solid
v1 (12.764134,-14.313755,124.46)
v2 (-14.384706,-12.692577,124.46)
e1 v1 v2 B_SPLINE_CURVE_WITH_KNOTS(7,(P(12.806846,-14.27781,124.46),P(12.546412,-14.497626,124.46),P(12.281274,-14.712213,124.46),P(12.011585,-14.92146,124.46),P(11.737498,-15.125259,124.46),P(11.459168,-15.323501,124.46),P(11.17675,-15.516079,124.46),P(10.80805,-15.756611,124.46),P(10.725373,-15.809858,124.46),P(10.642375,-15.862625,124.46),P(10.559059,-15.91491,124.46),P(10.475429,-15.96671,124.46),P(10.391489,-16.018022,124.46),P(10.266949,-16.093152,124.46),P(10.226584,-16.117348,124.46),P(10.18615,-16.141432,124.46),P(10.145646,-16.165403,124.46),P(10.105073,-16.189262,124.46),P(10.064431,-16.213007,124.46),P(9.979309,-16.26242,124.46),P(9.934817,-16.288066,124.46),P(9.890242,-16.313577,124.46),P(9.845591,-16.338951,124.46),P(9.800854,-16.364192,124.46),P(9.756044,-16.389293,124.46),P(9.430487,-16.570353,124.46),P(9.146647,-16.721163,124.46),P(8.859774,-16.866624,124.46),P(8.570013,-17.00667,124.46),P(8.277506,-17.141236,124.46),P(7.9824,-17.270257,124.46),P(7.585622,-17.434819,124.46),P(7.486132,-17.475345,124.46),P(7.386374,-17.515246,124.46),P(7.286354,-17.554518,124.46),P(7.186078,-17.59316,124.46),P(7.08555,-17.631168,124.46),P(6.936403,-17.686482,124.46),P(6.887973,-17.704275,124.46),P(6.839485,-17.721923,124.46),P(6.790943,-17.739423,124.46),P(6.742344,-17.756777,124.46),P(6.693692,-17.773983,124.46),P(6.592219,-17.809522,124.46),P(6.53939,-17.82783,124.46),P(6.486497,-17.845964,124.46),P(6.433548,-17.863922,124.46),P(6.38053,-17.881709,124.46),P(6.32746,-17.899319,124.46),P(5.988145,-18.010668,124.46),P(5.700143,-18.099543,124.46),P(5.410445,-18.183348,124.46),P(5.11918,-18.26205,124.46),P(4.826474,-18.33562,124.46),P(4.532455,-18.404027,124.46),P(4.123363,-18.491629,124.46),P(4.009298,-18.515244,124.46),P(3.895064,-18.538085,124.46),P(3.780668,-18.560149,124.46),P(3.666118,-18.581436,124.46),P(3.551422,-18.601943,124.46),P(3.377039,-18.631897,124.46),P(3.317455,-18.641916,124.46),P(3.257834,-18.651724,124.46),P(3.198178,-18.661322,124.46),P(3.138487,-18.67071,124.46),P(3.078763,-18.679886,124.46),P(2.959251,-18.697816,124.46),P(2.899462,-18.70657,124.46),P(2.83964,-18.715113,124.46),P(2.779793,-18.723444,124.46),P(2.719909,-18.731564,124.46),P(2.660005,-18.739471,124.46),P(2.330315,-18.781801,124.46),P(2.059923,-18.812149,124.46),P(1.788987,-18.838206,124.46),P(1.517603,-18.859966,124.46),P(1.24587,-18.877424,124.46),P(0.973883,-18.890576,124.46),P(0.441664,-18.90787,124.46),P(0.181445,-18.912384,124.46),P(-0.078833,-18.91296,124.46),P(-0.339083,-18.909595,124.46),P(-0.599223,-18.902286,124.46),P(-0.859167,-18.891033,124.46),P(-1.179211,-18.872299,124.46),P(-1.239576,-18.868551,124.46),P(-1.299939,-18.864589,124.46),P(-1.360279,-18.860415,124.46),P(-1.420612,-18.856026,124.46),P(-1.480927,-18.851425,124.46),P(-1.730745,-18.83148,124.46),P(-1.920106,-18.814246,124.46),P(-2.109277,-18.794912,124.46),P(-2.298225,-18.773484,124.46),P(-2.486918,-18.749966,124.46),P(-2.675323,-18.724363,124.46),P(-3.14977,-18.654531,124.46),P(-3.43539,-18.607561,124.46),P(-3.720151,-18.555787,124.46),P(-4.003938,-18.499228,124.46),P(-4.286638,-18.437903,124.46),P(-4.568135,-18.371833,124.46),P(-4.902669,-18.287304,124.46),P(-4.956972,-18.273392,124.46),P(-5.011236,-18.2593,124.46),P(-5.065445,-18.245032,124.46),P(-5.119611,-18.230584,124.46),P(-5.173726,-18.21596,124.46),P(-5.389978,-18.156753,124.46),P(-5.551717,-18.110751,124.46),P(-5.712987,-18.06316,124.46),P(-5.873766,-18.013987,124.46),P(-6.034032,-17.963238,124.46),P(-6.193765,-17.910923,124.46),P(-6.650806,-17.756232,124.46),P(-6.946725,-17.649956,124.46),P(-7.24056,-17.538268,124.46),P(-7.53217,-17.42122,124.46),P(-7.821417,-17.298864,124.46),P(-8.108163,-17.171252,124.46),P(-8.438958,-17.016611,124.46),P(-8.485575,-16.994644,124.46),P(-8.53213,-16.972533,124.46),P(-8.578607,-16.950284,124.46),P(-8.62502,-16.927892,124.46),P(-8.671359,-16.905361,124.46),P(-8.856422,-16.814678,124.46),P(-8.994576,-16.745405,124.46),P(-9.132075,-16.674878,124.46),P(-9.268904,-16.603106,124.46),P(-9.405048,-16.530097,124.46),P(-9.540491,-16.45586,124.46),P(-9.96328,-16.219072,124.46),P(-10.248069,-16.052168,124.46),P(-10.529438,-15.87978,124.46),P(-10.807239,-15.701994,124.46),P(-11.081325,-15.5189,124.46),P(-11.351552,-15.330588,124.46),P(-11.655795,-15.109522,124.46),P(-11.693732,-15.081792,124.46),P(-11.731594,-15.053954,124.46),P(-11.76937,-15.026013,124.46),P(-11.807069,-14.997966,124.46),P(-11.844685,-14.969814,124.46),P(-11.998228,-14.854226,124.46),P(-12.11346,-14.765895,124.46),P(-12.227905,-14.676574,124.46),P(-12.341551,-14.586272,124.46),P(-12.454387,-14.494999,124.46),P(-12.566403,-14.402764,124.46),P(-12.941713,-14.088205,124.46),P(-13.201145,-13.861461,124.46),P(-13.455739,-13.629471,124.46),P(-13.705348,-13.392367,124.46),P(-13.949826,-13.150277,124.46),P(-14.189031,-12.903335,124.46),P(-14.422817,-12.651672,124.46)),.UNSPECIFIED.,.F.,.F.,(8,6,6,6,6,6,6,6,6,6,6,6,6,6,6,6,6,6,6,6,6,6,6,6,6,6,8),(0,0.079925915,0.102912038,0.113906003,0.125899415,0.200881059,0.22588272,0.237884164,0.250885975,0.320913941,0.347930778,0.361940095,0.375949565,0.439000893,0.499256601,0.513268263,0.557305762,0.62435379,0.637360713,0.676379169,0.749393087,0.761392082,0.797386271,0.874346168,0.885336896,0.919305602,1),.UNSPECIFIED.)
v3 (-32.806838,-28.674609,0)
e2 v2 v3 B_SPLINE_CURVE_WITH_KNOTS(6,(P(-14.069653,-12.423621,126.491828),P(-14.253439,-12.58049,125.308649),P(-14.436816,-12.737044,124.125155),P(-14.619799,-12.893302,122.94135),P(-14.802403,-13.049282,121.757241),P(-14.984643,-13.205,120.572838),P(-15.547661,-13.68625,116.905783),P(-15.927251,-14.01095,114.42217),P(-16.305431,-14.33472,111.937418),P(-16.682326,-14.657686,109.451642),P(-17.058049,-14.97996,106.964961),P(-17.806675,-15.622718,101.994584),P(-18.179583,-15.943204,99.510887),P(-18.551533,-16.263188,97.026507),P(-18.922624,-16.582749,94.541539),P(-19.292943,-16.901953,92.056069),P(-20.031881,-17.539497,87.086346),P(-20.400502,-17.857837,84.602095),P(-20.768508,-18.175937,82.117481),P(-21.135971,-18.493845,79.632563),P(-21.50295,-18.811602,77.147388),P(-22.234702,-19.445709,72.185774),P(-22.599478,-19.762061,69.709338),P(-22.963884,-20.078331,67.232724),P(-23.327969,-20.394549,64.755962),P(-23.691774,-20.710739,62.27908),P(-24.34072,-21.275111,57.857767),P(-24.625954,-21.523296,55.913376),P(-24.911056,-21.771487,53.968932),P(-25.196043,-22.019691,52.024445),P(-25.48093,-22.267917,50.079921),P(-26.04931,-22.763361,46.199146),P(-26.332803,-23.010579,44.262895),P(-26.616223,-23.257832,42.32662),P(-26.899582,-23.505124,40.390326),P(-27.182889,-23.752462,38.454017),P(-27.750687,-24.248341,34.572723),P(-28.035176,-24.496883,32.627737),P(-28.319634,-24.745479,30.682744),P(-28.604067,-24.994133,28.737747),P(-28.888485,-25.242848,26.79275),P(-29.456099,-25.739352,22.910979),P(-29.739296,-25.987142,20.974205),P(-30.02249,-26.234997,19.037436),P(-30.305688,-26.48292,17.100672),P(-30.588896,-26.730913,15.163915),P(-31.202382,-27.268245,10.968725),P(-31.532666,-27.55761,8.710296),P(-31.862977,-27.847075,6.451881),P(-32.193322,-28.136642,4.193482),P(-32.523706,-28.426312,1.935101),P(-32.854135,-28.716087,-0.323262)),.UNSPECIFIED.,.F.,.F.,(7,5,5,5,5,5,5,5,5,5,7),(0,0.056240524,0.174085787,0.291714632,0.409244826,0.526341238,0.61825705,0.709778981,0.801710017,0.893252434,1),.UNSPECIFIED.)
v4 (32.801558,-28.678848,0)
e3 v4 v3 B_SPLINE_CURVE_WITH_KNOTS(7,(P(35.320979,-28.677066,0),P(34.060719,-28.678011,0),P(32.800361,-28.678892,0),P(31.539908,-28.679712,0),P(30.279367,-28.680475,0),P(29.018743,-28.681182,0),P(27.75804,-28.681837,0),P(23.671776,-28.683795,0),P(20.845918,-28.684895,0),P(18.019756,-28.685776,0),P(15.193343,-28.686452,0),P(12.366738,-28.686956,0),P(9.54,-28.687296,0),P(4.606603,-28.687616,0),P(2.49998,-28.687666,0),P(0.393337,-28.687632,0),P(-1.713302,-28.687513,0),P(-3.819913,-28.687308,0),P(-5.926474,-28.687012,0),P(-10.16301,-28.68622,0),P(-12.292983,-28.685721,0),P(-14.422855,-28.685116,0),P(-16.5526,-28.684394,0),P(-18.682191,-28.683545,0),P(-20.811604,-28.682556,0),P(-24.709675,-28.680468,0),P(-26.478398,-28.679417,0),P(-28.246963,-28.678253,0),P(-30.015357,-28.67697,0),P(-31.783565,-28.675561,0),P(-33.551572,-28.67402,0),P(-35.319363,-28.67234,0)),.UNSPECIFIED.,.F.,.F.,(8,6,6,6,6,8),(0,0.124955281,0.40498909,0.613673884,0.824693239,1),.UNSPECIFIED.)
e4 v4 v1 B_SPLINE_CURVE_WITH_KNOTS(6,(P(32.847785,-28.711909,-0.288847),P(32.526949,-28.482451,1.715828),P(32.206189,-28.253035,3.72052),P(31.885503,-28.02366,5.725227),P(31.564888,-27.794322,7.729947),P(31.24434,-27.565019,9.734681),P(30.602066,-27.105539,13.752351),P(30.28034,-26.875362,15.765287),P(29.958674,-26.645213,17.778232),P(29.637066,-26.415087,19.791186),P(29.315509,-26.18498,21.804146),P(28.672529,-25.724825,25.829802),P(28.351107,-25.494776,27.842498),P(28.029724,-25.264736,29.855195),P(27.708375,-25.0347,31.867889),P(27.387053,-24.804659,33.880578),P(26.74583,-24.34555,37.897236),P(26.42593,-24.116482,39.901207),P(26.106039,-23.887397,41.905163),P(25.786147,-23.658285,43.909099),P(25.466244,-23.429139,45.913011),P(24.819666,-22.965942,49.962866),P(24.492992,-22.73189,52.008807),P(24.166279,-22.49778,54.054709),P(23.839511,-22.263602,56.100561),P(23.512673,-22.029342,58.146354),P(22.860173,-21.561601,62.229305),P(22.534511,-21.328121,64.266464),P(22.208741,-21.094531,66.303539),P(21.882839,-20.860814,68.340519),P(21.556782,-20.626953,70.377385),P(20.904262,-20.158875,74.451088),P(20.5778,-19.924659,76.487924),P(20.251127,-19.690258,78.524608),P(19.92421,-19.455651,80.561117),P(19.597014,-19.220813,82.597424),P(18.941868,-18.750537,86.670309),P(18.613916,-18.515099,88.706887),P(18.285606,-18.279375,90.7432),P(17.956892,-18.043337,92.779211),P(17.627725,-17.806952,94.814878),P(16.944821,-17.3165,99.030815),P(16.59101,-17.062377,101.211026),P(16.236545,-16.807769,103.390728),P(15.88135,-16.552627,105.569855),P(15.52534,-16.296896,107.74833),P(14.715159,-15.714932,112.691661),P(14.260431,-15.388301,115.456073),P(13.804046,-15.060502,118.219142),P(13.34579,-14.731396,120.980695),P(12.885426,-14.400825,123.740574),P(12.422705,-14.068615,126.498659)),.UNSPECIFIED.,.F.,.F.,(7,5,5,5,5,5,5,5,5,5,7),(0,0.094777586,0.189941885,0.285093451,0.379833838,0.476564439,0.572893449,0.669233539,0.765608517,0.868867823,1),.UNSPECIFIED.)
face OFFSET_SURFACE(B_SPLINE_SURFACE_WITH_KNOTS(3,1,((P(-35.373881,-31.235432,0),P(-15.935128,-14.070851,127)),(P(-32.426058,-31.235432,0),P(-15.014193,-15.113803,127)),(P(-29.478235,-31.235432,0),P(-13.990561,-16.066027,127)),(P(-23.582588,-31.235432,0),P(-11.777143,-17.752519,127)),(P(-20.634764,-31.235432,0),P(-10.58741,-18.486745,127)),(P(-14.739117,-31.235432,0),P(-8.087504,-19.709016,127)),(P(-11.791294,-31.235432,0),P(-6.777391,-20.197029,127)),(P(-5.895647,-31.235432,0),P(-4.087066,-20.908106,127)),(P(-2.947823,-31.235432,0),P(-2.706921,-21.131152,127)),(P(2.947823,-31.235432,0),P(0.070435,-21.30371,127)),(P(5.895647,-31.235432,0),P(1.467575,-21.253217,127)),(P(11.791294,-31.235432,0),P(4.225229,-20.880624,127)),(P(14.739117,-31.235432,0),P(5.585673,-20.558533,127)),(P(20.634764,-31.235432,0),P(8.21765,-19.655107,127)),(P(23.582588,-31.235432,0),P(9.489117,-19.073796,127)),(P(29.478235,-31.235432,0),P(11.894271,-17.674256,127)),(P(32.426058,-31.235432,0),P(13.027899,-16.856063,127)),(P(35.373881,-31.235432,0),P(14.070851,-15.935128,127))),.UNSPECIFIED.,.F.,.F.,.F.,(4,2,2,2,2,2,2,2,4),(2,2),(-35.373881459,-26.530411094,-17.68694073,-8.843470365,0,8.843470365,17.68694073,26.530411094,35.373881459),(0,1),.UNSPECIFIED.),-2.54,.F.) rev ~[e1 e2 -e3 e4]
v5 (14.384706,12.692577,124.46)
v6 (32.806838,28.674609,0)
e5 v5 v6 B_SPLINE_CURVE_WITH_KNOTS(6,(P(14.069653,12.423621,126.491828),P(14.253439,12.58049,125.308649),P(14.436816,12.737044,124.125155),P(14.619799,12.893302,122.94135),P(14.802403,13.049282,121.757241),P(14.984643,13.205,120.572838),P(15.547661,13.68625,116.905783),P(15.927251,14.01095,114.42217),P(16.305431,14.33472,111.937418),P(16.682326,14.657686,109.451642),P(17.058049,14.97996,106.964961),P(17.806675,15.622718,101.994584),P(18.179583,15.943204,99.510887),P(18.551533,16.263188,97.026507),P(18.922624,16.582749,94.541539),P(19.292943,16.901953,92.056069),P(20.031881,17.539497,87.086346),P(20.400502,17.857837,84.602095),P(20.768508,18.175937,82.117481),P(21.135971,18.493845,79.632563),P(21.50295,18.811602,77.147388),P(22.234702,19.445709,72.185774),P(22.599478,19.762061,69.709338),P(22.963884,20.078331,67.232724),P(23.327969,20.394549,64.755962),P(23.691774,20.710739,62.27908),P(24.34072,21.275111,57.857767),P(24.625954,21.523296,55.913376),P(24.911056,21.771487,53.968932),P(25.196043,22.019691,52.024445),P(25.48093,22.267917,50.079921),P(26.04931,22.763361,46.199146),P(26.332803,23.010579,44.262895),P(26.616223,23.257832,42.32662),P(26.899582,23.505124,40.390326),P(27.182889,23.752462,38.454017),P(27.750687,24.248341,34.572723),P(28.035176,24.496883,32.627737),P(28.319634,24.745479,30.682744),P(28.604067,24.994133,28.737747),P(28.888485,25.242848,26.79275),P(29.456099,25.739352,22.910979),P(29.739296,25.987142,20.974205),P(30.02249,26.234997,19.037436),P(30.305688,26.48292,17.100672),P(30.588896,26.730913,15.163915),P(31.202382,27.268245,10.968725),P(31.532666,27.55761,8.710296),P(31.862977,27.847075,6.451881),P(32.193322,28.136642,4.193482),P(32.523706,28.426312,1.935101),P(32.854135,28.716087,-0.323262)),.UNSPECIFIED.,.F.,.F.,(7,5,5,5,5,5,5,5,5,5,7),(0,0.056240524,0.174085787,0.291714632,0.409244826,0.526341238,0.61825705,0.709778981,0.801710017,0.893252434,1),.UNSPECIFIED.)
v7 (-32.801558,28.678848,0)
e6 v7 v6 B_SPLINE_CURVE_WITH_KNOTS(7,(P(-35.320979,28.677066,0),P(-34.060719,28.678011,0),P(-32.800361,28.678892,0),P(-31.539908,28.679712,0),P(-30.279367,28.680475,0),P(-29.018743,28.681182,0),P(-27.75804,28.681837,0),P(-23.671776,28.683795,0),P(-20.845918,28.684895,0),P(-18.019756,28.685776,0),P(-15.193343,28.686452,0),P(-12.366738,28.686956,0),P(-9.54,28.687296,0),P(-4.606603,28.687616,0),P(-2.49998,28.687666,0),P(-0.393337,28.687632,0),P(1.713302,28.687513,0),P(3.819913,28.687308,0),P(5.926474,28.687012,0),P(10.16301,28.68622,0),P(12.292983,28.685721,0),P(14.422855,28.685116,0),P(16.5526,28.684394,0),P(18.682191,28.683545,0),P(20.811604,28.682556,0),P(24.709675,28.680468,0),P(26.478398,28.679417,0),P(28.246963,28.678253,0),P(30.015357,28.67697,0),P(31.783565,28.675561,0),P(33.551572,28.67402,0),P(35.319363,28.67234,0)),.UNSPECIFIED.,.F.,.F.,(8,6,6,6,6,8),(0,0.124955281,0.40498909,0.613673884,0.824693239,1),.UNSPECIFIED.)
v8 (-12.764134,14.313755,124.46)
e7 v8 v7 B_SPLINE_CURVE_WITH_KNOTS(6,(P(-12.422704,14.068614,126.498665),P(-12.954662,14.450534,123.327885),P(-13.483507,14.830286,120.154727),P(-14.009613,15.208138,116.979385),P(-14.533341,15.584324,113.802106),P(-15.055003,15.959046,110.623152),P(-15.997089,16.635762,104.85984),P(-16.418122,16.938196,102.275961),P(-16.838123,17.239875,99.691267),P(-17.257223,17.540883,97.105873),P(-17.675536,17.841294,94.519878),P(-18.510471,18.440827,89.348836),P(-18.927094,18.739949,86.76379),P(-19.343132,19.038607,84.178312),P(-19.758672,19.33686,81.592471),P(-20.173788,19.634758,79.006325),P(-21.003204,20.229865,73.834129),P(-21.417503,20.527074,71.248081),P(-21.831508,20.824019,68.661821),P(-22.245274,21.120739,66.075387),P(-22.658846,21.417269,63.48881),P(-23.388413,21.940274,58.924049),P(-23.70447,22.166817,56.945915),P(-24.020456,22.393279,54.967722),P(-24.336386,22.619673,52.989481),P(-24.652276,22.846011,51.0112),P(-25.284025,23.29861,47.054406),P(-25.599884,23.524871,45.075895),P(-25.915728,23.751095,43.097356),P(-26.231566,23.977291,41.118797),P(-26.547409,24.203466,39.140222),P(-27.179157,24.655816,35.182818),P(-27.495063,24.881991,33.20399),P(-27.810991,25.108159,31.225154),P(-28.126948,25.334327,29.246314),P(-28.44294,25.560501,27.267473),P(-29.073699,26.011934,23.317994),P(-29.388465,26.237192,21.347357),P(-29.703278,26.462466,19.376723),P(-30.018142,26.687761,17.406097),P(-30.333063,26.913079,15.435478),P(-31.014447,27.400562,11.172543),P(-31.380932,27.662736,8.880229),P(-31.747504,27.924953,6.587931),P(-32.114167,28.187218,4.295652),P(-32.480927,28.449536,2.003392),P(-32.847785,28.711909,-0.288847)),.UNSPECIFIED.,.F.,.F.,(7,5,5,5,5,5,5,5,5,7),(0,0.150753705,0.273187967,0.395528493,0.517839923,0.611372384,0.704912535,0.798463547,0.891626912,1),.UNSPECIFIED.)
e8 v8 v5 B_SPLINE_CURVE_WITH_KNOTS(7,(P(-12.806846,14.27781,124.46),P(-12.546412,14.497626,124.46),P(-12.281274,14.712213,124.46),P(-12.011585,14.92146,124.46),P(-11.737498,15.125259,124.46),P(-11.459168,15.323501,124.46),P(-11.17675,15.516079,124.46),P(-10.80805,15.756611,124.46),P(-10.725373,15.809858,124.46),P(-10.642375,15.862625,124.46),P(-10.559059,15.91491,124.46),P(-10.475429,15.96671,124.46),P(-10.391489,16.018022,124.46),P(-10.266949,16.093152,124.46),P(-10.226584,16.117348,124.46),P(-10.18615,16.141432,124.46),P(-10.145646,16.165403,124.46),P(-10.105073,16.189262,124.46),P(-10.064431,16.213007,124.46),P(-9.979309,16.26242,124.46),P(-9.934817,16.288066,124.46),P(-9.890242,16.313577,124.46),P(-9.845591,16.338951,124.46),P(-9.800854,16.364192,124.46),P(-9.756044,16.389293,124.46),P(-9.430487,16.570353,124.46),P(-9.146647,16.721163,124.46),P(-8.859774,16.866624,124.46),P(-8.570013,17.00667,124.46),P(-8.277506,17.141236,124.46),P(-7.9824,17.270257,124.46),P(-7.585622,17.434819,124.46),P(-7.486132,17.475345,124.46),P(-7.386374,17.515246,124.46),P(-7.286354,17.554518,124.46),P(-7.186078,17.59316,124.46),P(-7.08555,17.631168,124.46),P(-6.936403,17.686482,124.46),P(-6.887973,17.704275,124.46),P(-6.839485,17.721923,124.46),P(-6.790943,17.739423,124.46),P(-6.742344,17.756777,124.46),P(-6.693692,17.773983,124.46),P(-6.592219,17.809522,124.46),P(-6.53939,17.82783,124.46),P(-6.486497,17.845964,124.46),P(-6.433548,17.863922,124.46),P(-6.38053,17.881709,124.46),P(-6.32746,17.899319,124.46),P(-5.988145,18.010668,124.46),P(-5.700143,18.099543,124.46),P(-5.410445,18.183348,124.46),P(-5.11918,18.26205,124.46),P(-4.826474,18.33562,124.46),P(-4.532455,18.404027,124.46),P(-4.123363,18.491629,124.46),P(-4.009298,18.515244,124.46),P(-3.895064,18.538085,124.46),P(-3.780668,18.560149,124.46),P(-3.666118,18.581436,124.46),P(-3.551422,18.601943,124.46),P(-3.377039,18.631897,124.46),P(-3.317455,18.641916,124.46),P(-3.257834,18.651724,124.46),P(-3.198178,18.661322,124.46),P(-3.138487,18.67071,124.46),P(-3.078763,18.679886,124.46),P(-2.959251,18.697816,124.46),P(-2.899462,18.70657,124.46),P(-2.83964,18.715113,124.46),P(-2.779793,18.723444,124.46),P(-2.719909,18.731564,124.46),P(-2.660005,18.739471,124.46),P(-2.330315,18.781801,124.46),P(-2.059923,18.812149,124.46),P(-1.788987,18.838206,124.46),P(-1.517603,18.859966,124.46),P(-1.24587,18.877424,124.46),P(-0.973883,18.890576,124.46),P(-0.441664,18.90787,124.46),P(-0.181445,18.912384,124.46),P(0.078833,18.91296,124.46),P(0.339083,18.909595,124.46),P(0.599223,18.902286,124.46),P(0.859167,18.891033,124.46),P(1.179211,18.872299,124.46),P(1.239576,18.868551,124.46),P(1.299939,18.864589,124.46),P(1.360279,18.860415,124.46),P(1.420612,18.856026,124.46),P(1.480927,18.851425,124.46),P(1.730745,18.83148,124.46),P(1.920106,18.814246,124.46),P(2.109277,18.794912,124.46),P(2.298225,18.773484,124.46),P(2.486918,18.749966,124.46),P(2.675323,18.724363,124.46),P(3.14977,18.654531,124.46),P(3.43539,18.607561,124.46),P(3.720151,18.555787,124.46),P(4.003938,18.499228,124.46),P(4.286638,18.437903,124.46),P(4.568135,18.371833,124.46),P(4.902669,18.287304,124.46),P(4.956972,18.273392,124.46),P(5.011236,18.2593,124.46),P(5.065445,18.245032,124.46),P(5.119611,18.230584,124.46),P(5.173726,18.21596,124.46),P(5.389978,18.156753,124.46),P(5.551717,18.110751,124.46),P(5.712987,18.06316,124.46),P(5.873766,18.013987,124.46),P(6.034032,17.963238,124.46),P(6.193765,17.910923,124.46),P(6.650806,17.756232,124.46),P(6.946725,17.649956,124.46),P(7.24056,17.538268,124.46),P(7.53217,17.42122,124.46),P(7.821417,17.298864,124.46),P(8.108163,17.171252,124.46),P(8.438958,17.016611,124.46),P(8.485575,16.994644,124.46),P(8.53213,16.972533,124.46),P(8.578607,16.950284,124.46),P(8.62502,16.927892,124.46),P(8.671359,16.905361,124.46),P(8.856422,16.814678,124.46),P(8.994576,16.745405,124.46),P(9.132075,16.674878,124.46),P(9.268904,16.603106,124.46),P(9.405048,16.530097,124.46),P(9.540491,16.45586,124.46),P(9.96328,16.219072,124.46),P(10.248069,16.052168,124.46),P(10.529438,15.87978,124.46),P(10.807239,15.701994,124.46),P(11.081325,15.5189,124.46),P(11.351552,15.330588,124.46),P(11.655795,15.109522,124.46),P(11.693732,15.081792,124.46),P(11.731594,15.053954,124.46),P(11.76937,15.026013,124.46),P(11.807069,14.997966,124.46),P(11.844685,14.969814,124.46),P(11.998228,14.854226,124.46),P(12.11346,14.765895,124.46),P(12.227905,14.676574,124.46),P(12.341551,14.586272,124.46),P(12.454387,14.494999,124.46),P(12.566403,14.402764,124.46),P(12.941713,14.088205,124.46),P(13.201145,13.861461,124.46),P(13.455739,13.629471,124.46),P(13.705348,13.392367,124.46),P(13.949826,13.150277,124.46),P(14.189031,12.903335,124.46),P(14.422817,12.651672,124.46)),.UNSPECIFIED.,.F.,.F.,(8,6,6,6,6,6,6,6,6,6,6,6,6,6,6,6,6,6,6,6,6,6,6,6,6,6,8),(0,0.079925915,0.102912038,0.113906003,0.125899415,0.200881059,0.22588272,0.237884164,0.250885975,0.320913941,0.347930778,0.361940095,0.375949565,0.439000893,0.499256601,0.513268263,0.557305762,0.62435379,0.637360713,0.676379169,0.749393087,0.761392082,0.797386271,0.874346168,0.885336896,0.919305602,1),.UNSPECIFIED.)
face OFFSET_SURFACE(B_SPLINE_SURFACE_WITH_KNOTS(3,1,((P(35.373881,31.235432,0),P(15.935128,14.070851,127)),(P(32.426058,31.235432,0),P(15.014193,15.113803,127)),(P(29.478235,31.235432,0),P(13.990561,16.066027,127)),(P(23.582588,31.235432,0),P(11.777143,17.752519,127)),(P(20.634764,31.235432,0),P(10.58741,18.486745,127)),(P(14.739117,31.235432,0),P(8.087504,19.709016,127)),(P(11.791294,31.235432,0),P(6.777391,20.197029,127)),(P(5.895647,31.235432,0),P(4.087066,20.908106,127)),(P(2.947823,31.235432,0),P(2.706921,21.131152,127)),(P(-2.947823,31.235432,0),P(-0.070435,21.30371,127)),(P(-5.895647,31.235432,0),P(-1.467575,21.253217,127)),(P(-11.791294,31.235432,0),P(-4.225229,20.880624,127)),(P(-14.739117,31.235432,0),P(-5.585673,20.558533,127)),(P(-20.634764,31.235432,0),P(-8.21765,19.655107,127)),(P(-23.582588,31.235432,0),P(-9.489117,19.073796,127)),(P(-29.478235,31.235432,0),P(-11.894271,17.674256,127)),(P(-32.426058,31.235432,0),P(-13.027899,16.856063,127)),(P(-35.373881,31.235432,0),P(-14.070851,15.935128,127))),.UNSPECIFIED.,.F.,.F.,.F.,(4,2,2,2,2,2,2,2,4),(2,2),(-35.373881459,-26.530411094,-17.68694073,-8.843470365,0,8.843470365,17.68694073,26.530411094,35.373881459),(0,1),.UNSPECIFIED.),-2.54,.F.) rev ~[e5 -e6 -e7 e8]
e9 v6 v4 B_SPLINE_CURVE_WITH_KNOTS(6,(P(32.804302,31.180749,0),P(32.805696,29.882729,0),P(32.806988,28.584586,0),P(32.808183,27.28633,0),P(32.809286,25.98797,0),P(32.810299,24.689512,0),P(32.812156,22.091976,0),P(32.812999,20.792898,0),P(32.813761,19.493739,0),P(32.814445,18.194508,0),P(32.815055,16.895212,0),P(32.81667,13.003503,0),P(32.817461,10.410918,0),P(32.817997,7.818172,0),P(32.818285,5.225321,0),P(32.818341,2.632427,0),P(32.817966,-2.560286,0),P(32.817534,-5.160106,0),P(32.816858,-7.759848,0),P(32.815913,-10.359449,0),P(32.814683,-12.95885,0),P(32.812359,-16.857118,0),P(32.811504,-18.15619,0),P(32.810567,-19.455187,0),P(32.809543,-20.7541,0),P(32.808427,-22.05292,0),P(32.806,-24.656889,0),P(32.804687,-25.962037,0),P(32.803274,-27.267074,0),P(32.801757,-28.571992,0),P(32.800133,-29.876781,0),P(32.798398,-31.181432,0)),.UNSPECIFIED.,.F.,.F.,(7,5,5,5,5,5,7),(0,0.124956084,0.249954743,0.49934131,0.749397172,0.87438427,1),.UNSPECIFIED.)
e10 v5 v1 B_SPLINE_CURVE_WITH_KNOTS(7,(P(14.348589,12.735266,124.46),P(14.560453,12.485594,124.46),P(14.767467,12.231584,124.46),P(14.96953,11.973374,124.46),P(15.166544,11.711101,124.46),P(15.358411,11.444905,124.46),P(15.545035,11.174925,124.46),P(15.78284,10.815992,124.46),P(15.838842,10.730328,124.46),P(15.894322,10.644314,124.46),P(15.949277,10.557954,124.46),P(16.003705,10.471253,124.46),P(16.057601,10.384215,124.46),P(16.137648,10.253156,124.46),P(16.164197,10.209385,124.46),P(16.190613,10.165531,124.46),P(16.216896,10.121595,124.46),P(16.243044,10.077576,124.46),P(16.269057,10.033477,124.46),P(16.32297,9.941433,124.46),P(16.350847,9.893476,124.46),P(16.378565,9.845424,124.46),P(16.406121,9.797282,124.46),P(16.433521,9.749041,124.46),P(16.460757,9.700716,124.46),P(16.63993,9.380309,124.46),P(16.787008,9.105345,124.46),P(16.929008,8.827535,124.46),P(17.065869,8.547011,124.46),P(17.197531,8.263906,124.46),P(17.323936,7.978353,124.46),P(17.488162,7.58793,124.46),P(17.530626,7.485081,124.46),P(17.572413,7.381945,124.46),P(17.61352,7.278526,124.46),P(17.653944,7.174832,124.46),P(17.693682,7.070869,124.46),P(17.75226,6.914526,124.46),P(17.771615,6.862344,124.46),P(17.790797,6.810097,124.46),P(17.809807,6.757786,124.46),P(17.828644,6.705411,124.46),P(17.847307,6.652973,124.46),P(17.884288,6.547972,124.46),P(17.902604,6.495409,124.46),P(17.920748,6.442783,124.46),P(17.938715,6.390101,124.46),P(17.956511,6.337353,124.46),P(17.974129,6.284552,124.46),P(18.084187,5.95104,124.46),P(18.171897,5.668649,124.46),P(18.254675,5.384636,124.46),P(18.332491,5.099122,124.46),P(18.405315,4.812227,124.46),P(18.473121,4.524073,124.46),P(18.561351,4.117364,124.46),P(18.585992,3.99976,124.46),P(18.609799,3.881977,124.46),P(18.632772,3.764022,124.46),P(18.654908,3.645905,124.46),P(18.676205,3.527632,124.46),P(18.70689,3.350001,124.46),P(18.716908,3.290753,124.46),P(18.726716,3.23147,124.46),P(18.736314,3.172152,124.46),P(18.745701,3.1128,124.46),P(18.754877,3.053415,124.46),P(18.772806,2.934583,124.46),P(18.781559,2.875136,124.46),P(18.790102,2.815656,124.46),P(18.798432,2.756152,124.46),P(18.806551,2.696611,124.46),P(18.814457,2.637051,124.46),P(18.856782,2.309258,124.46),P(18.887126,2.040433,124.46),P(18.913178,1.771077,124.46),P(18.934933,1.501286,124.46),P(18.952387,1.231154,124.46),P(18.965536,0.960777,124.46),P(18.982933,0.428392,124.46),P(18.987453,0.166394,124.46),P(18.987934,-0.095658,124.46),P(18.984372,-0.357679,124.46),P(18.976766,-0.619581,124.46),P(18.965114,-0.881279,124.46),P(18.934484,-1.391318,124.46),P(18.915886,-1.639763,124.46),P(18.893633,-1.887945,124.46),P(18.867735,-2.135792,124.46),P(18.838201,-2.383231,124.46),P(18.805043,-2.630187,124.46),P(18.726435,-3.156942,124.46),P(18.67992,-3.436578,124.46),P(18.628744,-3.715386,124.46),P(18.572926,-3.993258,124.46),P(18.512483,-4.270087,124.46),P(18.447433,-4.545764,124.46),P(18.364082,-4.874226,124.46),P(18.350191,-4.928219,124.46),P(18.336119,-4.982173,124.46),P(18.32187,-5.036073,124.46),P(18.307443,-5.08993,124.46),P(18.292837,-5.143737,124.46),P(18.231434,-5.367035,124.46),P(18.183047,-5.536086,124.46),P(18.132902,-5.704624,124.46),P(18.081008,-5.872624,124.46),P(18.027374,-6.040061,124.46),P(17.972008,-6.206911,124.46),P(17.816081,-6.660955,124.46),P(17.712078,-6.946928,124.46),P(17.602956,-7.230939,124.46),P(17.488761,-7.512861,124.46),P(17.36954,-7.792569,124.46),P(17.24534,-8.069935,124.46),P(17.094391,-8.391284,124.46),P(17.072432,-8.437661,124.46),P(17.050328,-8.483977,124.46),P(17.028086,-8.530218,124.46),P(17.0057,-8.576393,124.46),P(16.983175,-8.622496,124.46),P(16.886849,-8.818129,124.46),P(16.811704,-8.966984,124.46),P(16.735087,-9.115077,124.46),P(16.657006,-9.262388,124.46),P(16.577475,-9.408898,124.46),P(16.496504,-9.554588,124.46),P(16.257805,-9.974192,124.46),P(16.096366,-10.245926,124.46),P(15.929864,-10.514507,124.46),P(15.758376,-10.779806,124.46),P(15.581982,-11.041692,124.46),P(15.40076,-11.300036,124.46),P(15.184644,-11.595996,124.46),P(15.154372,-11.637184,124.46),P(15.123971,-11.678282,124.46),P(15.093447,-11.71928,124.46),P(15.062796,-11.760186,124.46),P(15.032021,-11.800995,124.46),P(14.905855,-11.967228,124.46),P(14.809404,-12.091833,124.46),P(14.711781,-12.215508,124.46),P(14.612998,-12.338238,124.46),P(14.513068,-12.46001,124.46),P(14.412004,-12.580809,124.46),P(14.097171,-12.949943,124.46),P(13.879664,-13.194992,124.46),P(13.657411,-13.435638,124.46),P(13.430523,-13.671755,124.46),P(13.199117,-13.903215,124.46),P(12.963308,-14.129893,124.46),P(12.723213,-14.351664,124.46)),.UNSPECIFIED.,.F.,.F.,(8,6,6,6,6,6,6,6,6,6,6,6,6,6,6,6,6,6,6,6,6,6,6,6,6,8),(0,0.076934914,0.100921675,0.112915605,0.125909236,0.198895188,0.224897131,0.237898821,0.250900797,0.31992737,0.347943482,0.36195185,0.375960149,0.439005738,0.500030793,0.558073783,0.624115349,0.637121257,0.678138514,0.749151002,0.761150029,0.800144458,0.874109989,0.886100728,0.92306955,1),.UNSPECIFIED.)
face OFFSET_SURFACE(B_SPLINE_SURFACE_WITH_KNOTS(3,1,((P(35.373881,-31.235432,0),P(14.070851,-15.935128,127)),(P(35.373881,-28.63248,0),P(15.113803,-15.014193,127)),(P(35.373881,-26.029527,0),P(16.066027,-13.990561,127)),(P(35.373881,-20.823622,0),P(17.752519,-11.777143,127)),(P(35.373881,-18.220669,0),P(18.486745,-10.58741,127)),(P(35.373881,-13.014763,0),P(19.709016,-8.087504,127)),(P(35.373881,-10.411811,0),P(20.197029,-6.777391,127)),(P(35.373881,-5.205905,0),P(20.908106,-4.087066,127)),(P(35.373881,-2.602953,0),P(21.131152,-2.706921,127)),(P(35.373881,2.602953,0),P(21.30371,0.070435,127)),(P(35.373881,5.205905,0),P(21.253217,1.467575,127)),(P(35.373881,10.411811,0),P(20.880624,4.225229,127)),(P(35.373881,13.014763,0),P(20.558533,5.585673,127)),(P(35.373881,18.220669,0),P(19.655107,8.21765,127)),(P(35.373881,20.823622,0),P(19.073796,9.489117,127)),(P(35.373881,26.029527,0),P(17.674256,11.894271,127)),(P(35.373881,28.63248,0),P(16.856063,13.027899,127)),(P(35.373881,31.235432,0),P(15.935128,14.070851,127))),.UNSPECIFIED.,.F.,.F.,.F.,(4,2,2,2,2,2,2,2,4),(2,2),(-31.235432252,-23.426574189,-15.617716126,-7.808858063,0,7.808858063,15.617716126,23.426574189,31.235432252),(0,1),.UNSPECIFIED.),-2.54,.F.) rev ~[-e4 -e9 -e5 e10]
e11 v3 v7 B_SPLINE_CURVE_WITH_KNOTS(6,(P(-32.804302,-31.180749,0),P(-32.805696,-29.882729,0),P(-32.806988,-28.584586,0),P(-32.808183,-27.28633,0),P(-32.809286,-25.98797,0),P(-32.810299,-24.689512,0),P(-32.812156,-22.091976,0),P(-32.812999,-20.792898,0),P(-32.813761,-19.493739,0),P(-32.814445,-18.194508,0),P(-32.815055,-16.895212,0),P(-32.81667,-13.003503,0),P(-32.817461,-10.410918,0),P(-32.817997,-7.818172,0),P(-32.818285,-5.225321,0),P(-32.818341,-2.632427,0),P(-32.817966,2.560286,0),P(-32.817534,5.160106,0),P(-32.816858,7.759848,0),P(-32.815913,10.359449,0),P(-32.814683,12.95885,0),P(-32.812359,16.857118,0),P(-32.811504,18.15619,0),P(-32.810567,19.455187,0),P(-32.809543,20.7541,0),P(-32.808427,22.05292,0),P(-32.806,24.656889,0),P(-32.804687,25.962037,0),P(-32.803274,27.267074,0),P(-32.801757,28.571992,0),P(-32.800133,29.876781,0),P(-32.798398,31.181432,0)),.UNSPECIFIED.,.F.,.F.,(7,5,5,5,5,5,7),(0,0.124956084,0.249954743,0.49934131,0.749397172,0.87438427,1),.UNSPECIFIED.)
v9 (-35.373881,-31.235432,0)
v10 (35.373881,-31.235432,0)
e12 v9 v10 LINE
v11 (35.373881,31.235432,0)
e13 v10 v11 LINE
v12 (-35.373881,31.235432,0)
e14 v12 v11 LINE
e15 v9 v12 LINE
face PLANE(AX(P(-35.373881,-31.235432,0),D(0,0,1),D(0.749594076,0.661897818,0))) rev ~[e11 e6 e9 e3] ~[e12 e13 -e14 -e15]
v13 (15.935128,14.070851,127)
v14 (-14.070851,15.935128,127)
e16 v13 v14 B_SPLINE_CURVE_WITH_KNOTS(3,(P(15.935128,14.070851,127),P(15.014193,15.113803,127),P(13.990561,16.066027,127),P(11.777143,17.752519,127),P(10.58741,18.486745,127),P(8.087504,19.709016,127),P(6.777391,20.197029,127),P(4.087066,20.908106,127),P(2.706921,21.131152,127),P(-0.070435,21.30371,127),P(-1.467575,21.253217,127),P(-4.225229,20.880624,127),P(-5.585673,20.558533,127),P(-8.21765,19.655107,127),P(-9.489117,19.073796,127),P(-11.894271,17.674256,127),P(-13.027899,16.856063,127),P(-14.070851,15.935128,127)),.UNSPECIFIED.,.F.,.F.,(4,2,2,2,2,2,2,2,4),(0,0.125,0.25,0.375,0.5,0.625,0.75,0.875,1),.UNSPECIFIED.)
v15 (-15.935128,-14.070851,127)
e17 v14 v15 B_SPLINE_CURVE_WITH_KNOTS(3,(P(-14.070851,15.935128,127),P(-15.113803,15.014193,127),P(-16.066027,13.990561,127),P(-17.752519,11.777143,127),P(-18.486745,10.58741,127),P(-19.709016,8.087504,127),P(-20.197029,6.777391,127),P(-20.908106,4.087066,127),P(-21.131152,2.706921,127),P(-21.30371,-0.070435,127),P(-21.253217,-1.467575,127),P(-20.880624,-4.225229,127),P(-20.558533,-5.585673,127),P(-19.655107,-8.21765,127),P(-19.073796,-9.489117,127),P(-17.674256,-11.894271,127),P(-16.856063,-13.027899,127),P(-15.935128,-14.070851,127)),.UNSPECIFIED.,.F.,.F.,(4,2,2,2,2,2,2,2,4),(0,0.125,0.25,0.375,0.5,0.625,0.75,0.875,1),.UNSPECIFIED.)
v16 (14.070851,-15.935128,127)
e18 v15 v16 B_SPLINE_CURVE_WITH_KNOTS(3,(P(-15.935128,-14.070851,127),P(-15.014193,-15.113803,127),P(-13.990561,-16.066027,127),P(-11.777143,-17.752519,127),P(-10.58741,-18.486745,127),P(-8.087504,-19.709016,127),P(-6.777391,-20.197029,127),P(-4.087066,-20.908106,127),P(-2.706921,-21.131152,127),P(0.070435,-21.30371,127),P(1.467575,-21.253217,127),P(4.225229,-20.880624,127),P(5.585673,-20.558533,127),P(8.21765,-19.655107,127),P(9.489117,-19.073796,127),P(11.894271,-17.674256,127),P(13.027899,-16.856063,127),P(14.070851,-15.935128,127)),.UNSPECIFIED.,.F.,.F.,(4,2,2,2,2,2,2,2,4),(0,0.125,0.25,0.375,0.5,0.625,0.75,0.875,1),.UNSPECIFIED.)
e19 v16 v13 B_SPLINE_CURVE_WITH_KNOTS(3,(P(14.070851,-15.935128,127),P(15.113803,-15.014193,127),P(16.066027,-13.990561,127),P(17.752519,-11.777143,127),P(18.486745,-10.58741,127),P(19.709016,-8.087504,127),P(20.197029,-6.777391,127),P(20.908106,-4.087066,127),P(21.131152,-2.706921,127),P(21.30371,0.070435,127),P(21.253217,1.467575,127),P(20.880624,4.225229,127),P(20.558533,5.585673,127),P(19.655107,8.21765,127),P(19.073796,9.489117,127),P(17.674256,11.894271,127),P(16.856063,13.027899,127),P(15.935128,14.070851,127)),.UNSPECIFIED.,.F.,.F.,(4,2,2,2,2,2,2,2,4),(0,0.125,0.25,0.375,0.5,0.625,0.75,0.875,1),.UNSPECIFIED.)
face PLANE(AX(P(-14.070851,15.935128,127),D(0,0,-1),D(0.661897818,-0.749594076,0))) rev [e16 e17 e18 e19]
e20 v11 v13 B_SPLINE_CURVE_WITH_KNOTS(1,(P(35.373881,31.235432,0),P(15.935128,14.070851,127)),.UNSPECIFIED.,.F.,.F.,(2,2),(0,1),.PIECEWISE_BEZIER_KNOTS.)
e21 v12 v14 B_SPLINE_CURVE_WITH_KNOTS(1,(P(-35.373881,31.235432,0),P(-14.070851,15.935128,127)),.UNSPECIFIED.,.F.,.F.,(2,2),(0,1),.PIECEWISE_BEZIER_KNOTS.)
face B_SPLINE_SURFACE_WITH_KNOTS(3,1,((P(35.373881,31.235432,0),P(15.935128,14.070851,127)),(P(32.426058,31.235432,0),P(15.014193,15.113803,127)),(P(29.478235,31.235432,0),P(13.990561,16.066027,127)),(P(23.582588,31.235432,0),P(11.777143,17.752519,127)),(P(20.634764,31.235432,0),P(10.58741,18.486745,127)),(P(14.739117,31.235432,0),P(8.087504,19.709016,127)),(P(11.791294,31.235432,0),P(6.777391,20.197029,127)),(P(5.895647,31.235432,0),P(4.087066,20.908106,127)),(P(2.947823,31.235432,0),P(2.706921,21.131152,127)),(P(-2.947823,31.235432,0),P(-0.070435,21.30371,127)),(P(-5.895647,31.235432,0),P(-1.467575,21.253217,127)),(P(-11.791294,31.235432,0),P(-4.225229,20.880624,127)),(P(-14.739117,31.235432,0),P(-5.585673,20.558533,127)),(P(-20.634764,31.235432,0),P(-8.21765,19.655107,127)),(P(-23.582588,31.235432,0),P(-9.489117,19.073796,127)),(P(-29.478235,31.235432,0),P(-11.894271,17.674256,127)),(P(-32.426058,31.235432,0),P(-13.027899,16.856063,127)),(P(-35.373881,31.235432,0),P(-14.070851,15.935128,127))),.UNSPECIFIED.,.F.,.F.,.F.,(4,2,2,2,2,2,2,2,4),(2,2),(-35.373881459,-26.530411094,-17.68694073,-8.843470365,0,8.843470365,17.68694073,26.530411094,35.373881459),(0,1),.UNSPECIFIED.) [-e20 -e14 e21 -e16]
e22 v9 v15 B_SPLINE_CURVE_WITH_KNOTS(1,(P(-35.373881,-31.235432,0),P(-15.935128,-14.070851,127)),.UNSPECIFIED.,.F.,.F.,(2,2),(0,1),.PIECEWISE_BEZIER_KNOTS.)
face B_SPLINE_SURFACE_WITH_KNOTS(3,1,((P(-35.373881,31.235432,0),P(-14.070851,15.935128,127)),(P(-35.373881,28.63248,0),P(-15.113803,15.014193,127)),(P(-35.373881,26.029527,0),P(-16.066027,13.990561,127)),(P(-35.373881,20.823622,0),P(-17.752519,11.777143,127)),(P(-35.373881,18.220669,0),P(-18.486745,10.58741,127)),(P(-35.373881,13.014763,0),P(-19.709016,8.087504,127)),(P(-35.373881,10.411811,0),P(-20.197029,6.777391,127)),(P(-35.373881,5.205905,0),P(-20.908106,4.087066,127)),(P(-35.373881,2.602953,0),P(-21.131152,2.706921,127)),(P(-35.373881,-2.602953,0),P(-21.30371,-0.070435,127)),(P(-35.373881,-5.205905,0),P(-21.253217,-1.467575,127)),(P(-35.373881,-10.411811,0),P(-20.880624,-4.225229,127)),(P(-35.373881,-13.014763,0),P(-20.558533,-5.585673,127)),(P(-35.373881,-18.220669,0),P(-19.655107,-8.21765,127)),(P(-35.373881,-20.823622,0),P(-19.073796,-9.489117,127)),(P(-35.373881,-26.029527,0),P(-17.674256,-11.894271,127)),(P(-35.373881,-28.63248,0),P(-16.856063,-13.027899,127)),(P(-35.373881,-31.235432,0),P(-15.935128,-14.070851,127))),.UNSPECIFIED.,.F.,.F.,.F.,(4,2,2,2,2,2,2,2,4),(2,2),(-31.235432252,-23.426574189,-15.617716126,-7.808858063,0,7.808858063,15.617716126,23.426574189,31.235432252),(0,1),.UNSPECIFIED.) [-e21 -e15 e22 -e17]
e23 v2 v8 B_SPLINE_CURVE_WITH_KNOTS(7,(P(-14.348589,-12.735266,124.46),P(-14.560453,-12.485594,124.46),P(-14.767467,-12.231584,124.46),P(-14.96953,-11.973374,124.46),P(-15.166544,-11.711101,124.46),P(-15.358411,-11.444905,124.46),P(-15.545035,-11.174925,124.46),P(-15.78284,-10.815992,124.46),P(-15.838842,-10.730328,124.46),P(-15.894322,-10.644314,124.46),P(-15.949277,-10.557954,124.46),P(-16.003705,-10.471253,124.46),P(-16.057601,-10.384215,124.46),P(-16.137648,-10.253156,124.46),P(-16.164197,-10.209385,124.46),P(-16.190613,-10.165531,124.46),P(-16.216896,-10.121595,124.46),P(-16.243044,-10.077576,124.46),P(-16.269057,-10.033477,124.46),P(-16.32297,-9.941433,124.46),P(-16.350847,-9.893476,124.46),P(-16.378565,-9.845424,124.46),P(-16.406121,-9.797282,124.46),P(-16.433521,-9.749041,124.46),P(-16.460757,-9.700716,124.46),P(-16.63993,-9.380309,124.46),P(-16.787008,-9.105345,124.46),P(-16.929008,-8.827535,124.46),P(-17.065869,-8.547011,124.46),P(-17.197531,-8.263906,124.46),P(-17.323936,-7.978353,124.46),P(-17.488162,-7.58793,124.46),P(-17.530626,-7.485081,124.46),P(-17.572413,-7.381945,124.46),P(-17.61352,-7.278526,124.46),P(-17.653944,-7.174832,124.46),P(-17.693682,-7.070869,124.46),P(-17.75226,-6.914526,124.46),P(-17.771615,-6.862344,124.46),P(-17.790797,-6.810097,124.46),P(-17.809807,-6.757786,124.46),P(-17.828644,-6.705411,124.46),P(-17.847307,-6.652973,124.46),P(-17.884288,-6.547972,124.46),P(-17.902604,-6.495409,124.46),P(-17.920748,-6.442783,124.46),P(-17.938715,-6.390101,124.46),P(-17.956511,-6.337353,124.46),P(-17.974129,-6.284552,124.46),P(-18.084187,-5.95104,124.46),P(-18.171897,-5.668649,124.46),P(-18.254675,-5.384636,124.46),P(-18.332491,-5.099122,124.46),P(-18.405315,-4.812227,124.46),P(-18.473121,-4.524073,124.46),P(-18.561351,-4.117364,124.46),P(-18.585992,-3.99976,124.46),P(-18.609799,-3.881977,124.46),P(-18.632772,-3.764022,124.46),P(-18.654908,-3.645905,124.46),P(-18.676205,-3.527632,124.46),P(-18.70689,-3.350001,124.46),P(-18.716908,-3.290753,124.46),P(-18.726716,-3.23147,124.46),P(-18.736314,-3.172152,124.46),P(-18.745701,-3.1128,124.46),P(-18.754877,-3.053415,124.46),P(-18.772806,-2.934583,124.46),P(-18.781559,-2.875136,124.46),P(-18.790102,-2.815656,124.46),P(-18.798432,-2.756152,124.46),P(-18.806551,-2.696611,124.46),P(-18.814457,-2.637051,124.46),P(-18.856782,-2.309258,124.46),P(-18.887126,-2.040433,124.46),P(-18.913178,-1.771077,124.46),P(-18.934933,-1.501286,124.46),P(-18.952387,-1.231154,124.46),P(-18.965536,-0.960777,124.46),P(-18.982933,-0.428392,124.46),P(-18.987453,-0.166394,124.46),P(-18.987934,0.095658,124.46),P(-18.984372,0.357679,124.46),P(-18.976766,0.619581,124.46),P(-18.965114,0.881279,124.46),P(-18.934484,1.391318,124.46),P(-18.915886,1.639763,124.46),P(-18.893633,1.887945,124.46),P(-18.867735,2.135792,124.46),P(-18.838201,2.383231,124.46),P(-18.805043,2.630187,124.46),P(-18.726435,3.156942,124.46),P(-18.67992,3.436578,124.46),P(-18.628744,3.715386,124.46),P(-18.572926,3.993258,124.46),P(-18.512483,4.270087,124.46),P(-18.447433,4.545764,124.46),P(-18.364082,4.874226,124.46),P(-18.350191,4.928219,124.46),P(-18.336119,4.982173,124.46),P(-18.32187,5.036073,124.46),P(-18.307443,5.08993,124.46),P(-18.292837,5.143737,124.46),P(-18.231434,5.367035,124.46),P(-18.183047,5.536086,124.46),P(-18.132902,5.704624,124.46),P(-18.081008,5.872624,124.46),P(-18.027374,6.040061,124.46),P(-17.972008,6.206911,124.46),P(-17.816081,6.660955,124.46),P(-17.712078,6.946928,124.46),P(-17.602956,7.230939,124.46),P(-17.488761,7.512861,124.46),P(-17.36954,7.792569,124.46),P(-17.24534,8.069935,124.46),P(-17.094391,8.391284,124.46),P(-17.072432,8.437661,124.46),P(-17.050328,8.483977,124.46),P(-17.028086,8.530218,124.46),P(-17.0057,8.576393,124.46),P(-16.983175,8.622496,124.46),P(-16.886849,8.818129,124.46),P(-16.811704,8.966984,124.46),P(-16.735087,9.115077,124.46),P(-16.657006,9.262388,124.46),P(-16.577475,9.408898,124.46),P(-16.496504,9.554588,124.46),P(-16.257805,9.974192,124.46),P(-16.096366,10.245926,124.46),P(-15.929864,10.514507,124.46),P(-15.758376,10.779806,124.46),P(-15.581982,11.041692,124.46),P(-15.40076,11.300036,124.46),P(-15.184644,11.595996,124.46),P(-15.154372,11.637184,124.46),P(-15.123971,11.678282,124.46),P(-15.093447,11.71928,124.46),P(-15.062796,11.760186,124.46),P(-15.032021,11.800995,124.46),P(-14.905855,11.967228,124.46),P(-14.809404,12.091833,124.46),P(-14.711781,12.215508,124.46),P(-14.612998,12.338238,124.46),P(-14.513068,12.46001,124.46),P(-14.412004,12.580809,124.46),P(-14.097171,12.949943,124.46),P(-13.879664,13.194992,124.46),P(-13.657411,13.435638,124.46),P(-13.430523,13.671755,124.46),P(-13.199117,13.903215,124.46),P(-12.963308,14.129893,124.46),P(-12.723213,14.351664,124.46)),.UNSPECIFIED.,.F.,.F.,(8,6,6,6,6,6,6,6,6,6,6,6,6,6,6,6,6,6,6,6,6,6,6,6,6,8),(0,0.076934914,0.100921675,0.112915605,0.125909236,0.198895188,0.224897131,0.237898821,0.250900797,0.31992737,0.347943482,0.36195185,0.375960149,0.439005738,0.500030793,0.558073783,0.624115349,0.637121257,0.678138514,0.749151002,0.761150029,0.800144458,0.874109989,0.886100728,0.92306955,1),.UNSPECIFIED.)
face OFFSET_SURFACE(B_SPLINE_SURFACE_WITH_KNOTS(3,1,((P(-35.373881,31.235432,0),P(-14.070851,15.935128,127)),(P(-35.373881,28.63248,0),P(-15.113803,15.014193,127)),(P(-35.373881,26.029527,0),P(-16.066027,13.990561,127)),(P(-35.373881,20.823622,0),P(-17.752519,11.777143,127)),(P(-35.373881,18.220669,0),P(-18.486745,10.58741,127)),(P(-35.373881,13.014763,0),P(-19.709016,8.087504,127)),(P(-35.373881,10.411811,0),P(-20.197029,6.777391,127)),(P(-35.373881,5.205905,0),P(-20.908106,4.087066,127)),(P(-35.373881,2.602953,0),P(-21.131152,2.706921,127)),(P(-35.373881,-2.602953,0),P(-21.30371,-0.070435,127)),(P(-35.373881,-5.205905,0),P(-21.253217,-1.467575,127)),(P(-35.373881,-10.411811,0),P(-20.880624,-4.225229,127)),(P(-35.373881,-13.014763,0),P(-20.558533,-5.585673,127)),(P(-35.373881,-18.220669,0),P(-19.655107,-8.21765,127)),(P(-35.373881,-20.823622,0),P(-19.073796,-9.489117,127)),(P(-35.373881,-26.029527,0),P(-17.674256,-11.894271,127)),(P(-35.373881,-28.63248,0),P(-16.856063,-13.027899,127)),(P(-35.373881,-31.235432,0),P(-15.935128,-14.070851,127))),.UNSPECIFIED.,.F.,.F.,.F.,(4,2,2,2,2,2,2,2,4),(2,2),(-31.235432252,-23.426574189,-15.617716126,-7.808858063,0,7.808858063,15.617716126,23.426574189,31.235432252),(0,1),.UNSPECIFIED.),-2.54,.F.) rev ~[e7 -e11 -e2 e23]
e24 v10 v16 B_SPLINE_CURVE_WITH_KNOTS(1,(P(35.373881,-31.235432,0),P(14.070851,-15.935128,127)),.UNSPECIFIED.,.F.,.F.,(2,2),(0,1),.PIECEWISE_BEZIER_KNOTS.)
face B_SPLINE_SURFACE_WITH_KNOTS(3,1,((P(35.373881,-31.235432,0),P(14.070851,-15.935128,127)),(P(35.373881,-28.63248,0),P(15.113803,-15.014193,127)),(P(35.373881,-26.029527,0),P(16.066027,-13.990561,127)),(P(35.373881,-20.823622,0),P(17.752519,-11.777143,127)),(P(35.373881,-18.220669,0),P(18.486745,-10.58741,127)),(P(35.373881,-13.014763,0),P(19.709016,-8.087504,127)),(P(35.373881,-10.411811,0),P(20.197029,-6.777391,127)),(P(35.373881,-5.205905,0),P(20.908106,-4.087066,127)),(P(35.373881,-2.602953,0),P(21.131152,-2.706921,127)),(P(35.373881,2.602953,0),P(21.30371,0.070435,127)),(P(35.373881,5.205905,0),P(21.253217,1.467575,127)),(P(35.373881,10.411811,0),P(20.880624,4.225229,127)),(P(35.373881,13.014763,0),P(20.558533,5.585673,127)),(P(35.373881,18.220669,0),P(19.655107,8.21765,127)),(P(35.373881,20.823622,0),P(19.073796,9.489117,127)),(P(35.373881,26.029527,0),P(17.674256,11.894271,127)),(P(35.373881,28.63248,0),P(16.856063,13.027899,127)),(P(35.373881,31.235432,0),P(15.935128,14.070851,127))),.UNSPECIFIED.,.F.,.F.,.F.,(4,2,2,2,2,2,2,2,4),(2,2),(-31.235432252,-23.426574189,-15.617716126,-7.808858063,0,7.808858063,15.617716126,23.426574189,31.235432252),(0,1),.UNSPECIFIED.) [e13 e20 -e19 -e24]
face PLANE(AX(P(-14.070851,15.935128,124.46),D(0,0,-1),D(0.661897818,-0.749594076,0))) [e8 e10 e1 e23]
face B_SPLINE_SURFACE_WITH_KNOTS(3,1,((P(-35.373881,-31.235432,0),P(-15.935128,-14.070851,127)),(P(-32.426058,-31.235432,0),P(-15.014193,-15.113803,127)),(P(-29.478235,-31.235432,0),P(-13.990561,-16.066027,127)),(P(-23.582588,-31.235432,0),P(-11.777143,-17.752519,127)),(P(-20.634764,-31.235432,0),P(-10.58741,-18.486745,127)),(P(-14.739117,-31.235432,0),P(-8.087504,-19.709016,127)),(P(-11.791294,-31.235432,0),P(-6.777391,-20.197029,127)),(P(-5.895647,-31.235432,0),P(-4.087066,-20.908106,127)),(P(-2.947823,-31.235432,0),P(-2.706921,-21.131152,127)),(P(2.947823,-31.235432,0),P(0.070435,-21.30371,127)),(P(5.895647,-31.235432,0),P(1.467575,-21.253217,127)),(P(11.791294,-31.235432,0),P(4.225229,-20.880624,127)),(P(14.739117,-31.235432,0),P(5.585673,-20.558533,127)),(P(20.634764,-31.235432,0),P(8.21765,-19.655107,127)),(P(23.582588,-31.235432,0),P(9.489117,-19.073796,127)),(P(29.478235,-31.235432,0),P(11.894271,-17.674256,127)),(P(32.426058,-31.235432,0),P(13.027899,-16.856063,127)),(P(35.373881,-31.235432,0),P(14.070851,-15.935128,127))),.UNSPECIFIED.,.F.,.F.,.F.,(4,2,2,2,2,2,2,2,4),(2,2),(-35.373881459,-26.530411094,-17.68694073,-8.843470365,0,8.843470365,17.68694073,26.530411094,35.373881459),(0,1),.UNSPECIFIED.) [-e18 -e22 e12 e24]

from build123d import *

# Parameters (mm, degrees)
F0_W = 70.7477629185
F0_H = 62.4708645046
F4_T = 2.54


# Not quite as in the source:
# - the arcs of a loft's sections are written as splines that run evenly, so that the points pair up as in the source's solid
# - a shell that OpenCascade refuses in one call is made with other operations: the cavity is built on its own and cut out


with BuildPart() as f3:
    # F0 (on Top) → F3 section 0
    with BuildSketch(Plane.XY):
        Rectangle(F0_W, F0_H)
    # F2 (on offset) → F3 section 1
    with BuildSketch(Plane.XY.offset(127)):
        with BuildLine():
            add(Edge.make_bspline(
                [(15.9351280148, 14.0708508936), (15.0141929774, 15.1138025832), (13.9905614763, 16.0660265425), (11.7771428565, 17.7525188473), (10.5874104689, 18.4867454911), (8.0875037404, 19.7090157679), (6.7773912146, 20.1970291779), (4.087066391, 20.9081062654), (2.7069206167, 21.13115236), (-0.0704346278, 21.3037099645), (-1.4675754224, 21.2532172075), (-4.2252288833, 20.8806240369), (-5.5856733611, 20.5585328366), (-8.2176499623, 19.6551074376), (-9.4891170049, 19.0737955781), (-11.8942713618, 17.6742560822), (-13.0278992039, 16.8560630523), (-14.0708508936, 15.9351280148)],
                knots=[0, 0, 0, 0, 0.125, 0.125, 0.25, 0.25, 0.375, 0.375, 0.5, 0.5, 0.625, 0.625, 0.75, 0.75, 0.875, 0.875, 1, 1, 1, 1], degree=3))
            add(Edge.make_bspline(
                [(-14.0708508936, 15.9351280148), (-15.1138025832, 15.0141929774), (-16.0660265425, 13.9905614763), (-17.7525188473, 11.7771428565), (-18.4867454911, 10.5874104689), (-19.7090157679, 8.0875037404), (-20.1970291779, 6.7773912146), (-20.9081062654, 4.087066391), (-21.13115236, 2.7069206167), (-21.3037099645, -0.0704346278), (-21.2532172075, -1.4675754224), (-20.8806240369, -4.2252288833), (-20.5585328366, -5.5856733611), (-19.6551074376, -8.2176499623), (-19.0737955781, -9.4891170049), (-17.6742560822, -11.8942713618), (-16.8560630523, -13.0278992039), (-15.9351280148, -14.0708508936)],
                knots=[0, 0, 0, 0, 0.125, 0.125, 0.25, 0.25, 0.375, 0.375, 0.5, 0.5, 0.625, 0.625, 0.75, 0.75, 0.875, 0.875, 1, 1, 1, 1], degree=3))
            add(Edge.make_bspline(
                [(-15.9351280148, -14.0708508936), (-15.0141929774, -15.1138025832), (-13.9905614763, -16.0660265425), (-11.7771428565, -17.7525188473), (-10.5874104689, -18.4867454911), (-8.0875037404, -19.7090157679), (-6.7773912146, -20.1970291779), (-4.087066391, -20.9081062654), (-2.7069206167, -21.13115236), (0.0704346278, -21.3037099645), (1.4675754224, -21.2532172075), (4.2252288833, -20.8806240369), (5.5856733611, -20.5585328366), (8.2176499623, -19.6551074376), (9.4891170049, -19.0737955781), (11.8942713618, -17.6742560822), (13.0278992039, -16.8560630523), (14.0708508936, -15.9351280148)],
                knots=[0, 0, 0, 0, 0.125, 0.125, 0.25, 0.25, 0.375, 0.375, 0.5, 0.5, 0.625, 0.625, 0.75, 0.75, 0.875, 0.875, 1, 1, 1, 1], degree=3))
            add(Edge.make_bspline(
                [(14.0708508936, -15.9351280148), (15.1138025832, -15.0141929774), (16.0660265425, -13.9905614763), (17.7525188473, -11.7771428565), (18.4867454911, -10.5874104689), (19.7090157679, -8.0875037404), (20.1970291779, -6.7773912146), (20.9081062654, -4.087066391), (21.13115236, -2.7069206167), (21.3037099645, 0.0704346278), (21.2532172075, 1.4675754224), (20.8806240369, 4.2252288833), (20.5585328366, 5.5856733611), (19.6551074376, 8.2176499623), (19.0737955781, 9.4891170049), (17.6742560822, 11.8942713618), (16.8560630523, 13.0278992039), (15.9351280148, 14.0708508936)],
                knots=[0, 0, 0, 0, 0.125, 0.125, 0.25, 0.25, 0.375, 0.375, 0.5, 0.5, 0.625, 0.625, 0.75, 0.75, 0.875, 0.875, 1, 1, 1, 1], degree=3))
        make_face()
    loft(ruled=True)

    # F4: shell of thickness 2.54, made by hand


with BuildPart() as f4_core1:
    # F4_t2: copy of F3
    add(f3.part)

    # the walls: a layer under each face that stays
    f4_faces = [f4_core1.faces().sort_by_distance(p)[0] for p in [
        (28.2956563107, -0.6591214972, 63.5),
        (0.6591214972, 26.2264317073, 63.5),
        (-28.2956563107, 0.6591214972, 63.5),
        (-0.6591214972, -26.2264317073, 63.5),
        (0, 0, 127),
    ]]
    thicken(f4_faces, amount=-F4_T, mode=Mode.SUBTRACT)


with BuildPart() as f3_1:
    add(f3.part)

    # what is left inside the walls is the cavity
    f4_cavity = [f4_core1.part.solids().sort_by_distance(p)[0] for p in [
        (-0.40374, -25.381852, 41.586065),
    ]]
    add(f4_cavity, mode=Mode.SUBTRACT)


solid = f3_1.part
